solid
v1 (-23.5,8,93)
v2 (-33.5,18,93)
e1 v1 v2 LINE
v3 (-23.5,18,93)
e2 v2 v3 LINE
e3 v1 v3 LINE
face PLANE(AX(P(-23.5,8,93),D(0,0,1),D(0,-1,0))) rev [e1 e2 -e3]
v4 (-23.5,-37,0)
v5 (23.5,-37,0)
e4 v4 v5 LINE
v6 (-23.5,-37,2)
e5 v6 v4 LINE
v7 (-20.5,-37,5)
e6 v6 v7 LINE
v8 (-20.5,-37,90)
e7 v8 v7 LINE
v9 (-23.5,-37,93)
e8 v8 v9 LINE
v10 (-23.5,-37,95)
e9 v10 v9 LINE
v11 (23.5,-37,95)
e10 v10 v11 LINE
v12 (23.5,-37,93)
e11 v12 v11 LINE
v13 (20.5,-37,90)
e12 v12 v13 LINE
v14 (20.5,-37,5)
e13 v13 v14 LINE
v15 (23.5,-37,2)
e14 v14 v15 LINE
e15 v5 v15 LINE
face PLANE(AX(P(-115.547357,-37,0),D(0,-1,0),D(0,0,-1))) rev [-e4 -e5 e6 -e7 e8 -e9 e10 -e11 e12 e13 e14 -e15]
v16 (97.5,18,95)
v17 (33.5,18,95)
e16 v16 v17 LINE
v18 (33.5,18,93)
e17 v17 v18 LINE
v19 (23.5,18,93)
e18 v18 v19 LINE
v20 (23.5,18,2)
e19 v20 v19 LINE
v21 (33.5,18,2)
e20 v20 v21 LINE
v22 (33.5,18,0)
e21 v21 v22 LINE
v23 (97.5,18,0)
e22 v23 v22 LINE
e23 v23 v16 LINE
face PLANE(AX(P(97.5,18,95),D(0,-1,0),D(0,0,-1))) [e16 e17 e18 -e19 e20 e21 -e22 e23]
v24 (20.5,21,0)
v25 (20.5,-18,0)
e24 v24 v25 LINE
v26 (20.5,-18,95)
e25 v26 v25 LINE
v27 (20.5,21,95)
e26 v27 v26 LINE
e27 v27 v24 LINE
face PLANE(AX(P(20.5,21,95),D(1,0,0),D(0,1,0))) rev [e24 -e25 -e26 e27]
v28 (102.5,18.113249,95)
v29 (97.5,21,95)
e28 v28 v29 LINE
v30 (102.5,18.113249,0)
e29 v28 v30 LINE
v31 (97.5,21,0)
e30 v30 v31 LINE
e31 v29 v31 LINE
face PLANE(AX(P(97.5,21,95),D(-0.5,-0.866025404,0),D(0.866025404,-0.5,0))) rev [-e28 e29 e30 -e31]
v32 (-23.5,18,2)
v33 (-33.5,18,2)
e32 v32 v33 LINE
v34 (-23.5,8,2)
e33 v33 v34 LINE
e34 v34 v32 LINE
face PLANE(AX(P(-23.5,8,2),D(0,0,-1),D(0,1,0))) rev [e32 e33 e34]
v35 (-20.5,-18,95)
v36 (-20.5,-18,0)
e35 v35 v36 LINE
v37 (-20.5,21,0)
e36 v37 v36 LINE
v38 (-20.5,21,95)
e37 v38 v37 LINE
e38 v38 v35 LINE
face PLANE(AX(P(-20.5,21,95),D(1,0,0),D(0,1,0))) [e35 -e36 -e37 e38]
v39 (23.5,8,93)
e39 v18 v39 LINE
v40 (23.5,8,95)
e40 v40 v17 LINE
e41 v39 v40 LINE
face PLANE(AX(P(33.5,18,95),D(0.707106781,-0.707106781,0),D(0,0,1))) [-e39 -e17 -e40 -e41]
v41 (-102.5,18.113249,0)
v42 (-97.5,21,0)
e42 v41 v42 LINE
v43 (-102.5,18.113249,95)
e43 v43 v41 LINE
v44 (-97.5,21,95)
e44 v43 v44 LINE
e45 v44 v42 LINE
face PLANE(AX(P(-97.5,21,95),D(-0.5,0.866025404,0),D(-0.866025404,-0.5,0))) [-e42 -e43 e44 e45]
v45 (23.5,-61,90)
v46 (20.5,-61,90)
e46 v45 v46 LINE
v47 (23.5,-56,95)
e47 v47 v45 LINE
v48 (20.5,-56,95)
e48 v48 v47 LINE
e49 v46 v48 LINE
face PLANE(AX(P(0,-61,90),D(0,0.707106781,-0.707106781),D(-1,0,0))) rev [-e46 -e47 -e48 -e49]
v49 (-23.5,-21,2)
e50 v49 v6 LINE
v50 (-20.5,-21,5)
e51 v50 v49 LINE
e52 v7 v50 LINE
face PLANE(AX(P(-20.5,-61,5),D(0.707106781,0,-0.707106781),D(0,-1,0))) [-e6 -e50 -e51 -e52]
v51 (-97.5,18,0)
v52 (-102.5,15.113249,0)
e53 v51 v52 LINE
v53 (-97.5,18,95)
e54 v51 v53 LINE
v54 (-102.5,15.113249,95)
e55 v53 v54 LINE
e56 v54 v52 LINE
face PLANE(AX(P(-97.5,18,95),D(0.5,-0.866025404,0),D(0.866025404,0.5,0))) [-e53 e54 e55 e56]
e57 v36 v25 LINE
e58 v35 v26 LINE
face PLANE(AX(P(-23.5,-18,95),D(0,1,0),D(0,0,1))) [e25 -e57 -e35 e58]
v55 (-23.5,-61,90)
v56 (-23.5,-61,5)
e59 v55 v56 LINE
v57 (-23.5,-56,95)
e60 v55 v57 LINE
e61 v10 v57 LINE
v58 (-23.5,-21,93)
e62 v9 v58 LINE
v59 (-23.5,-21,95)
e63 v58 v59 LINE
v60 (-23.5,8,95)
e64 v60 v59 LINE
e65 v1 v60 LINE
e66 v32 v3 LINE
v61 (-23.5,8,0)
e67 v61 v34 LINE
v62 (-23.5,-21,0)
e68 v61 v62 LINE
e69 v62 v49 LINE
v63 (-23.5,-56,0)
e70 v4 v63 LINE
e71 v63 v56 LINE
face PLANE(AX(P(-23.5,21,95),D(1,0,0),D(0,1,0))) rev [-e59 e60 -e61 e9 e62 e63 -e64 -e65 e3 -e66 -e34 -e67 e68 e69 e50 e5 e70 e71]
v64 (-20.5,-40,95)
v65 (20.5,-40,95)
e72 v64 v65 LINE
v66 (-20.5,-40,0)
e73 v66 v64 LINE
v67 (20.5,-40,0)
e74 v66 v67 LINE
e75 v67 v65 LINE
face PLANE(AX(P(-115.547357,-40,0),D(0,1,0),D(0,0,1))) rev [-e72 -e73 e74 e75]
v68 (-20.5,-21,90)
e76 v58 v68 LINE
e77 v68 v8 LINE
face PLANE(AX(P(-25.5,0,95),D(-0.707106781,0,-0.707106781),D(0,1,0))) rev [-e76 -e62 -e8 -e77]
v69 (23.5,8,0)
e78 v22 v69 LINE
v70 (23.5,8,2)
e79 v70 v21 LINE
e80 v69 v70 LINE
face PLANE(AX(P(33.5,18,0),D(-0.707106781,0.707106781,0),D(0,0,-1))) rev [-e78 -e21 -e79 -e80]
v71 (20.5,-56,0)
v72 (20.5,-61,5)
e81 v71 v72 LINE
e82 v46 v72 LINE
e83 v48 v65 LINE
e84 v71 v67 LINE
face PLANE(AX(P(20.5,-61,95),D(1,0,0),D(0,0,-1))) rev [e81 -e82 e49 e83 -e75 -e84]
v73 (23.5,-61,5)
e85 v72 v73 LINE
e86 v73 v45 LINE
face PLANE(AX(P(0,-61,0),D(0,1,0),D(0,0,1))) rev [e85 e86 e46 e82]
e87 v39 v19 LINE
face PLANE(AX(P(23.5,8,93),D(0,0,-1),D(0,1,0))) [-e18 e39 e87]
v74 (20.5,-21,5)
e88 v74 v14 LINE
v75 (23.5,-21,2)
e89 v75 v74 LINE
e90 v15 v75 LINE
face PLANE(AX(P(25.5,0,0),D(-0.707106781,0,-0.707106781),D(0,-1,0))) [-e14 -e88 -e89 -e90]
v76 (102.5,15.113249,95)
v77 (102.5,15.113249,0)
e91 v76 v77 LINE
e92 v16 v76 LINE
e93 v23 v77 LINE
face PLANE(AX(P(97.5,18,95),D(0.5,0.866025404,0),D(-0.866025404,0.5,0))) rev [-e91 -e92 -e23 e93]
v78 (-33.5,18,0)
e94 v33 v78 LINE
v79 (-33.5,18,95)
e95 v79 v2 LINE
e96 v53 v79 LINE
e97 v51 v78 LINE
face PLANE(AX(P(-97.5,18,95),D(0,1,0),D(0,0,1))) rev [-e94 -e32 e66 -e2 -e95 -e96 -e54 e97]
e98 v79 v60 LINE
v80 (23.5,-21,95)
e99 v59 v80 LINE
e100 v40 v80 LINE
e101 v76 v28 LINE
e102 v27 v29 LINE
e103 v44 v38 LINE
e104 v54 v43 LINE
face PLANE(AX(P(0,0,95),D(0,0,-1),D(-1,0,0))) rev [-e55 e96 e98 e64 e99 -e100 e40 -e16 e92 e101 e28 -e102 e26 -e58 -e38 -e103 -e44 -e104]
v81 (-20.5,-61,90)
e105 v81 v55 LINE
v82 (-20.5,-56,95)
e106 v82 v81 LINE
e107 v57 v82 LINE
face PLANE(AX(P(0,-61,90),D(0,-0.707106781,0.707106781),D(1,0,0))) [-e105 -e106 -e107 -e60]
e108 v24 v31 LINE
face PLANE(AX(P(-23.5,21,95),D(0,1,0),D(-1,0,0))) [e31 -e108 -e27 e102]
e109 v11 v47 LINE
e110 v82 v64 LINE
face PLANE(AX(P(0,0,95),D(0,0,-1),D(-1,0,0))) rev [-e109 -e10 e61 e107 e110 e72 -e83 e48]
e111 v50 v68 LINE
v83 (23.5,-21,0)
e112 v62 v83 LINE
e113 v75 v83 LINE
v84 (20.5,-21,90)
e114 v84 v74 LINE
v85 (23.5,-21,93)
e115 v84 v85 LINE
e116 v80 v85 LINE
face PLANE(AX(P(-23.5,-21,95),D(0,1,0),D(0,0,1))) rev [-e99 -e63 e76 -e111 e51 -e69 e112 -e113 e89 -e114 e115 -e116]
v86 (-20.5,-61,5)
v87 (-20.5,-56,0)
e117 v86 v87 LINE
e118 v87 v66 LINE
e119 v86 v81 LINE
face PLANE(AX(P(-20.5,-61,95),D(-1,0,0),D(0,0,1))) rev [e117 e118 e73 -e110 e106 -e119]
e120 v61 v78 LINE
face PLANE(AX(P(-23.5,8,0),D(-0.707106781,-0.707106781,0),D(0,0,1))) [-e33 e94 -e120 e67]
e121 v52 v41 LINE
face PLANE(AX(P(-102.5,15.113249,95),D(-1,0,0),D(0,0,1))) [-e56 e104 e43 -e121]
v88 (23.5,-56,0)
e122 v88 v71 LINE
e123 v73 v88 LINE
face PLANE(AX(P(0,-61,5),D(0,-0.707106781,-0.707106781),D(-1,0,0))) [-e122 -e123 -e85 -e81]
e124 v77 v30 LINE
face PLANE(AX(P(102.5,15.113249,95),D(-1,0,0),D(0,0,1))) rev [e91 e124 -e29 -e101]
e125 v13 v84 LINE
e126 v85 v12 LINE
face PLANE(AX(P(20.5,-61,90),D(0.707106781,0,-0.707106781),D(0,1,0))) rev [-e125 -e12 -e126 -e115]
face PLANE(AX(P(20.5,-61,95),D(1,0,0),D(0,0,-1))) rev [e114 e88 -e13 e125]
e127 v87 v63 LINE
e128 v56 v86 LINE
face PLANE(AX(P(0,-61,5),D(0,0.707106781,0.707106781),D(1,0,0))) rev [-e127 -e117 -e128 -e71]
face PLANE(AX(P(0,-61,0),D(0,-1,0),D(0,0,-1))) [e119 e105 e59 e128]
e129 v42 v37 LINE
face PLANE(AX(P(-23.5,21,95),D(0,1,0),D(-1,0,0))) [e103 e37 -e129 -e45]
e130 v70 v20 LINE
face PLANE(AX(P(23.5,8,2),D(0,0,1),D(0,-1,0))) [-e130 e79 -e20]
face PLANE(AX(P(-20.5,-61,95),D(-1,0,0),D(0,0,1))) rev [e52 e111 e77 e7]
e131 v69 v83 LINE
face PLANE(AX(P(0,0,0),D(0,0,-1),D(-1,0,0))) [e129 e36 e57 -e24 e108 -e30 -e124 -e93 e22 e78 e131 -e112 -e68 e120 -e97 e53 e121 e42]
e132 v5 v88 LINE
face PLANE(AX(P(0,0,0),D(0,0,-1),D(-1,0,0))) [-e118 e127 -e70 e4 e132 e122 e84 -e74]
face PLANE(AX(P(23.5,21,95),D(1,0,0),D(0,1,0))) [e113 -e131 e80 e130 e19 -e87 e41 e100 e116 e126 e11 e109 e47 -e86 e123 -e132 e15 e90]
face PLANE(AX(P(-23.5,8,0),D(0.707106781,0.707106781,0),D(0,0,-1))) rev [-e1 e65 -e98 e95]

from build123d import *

# Parameters (mm, degrees)
SKETCH1_W                = 47
SKETCH1_H                = 42
BOSS_EXTRUDE1_DEPTH      = 95
SHELL1_T                 = -3
SKETCH2_W                = 95
SKETCH2_H                = 3
BOSS_EXTRUDE2_DEPTH      = 74
SKETCH3_W                = 3
SKETCH3_H                = 95
BOSS_EXTRUDE3_DEPTH      = 40
SKETCH4_W                = 95
SKETCH4_H                = 3
BOSS_EXTRUDE4_DEPTH      = 41
CHAMFER2_SIZE            = 5
CHAMFER3_SIZE            = 5
BOSS_EXTRUDE5_DEPTH      = 95
SKETCH10_W               = 10
SKETCH10_H               = 2
BOSS_EXTRUDE7_DEPTH      = 10
CHAMFER5_SIZE            = 10
CHAMFER5_OF_MIRROR5_SIZE = 10


# Some blends are built 0.0001 mm under size
with BuildPart() as part:
    # Sketch1 → Boss-Extrude1 (new body)
    with BuildSketch(Plane.XY):
        Rectangle(SKETCH1_W, SKETCH1_H)
    extrude(amount=BOSS_EXTRUDE1_DEPTH)

    # Shell1
    shell1_openings = [part.faces().sort_by_distance(p)[0] for p in [
        (0, 0, 95),
        (0, 0, 0),
        (0, 21, 47.5),
    ]]
    offset(amount=SHELL1_T, openings=shell1_openings, kind=Kind.INTERSECTION)

    # Sketch2 → Boss-Extrude2 (add)
    with BuildSketch(Plane.ZY.offset(23.5)):
        with Locations((47.5, 19.5)):
            Rectangle(SKETCH2_W, SKETCH2_H)
    boss_extrude2 = extrude(amount=BOSS_EXTRUDE2_DEPTH)

    # Mirror1: Boss-Extrude2 across plane
    add(boss_extrude2.mirror(Plane(origin=(0, 0, 0), x_dir=(0, 0, 1), z_dir=(1, 0, 0))))

    # Sketch3 → Boss-Extrude3 (add)
    with BuildSketch(Plane.XZ.offset(21)):
        with Locations((-22, 47.5)):
            Rectangle(SKETCH3_W, SKETCH3_H)
        with Locations((22, 47.5)):
            Rectangle(SKETCH3_W, SKETCH3_H)
    extrude(amount=BOSS_EXTRUDE3_DEPTH)

    # Sketch4 → Boss-Extrude4 (add)
    with BuildSketch(Plane.ZY.offset(-20.5)):
        with Locations((47.5, -38.5)):
            Rectangle(SKETCH4_W, SKETCH4_H)
    extrude(amount=BOSS_EXTRUDE4_DEPTH)

    # Chamfer2
    chamfer2_edges = [part.edges().sort_by_distance(p)[0] for p in [
        (-22, -61, 0),
        (-22, -61, 95),
        (22, -61, 95),
        (22, -61, 0),
    ]]
    chamfer(chamfer2_edges, length=CHAMFER2_SIZE)

    # Chamfer3
    # the kernel refuses this chamfer: 5 mm, written as the material it takes off along each edge
    with BuildSketch(Plane(origin=(-20.5, -21, 95), x_dir=(-0.9996219169112968, 0, 0.0274958766105877), z_dir=(0, -1, 0)), Plane(origin=(20.5, -21, 0), x_dir=(0.9996219169112968, 0, -0.027495876610586372), z_dir=(0, -1, 0))) as chamfer3_piece_1:
        Polygon((CHAMFER3_SIZE * 0.999621916911, CHAMFER3_SIZE * 0.0274958766106), (-CHAMFER3_SIZE * 0.0274958766106, CHAMFER3_SIZE * 0.999621916911), (0, 0), align=None)
    extrude(amount=16, mode=Mode.SUBTRACT)
    with BuildSketch(Plane(origin=(-20.5, -21, 0), x_dir=(-0.9996219169112968, 0, -0.027495876610586372), z_dir=(0, -1, 0)), Plane(origin=(20.5, -21, 95), x_dir=(0.9996219169112968, 0, 0.0274958766105877), z_dir=(0, -1, 0))) as chamfer3_piece_2:
        Polygon((CHAMFER3_SIZE * 0.999621916911, -CHAMFER3_SIZE * 0.0274958766106), (-CHAMFER3_SIZE * 0.0274958766106, -CHAMFER3_SIZE * 0.999621916911), (0, 0), align=None)
    extrude(amount=16, mode=Mode.SUBTRACT)

    # Sketch5 → Boss-Extrude5 (add)
    with BuildSketch(Plane(origin=(0, 0, 0), x_dir=(-1, 0, 0), z_dir=(0, 0, -1))):
        Polygon((97.5, 18), (97.5, 21), (102.5, 18.113248654), (102.5, 15.113248654), align=None)
    boss_extrude5 = extrude(amount=-BOSS_EXTRUDE5_DEPTH)

    # Mirror2: Boss-Extrude5 across plane
    add(boss_extrude5.mirror(Plane(origin=(0, 0, 0), x_dir=(0, 0, 1), z_dir=(1, 0, 0))))

    # Sketch10 → Boss-Extrude7 (add)
    with BuildSketch(Plane.XZ.offset(-18)):
        with Locations((-28.5, 94)):
            Rectangle(SKETCH10_W, SKETCH10_H)
        with Locations((-28.5, 1)):
            Rectangle(SKETCH10_W, SKETCH10_H)
    boss_extrude7 = extrude(amount=BOSS_EXTRUDE7_DEPTH)

    # Chamfer5
    chamfer5_edges = [part.edges().sort_by_distance(p)[0] for p in [
        (-33.5, 8, 94),
        (-33.5, 8, 1),
    ]]
    chamfer(chamfer5_edges, length=CHAMFER5_SIZE - 0.0001)  # a hair under: the kernel refuses the full size

    # Mirror5: Boss-Extrude7 across plane
    add(boss_extrude7.mirror(Plane(origin=(0, 0, 0), x_dir=(0, 0, 1), z_dir=(1, 0, 0))))

    # Chamfer5 of Mirror5
    chamfer5_of_mirror5_edges = [part.edges().sort_by_distance(p)[0] for p in [
        (33.5, 8, 94),
        (33.5, 8, 1),
    ]]
    chamfer(chamfer5_of_mirror5_edges, length=CHAMFER5_OF_MIRROR5_SIZE - 0.0001)  # a hair under: the kernel refuses the full size


solid = part.part
